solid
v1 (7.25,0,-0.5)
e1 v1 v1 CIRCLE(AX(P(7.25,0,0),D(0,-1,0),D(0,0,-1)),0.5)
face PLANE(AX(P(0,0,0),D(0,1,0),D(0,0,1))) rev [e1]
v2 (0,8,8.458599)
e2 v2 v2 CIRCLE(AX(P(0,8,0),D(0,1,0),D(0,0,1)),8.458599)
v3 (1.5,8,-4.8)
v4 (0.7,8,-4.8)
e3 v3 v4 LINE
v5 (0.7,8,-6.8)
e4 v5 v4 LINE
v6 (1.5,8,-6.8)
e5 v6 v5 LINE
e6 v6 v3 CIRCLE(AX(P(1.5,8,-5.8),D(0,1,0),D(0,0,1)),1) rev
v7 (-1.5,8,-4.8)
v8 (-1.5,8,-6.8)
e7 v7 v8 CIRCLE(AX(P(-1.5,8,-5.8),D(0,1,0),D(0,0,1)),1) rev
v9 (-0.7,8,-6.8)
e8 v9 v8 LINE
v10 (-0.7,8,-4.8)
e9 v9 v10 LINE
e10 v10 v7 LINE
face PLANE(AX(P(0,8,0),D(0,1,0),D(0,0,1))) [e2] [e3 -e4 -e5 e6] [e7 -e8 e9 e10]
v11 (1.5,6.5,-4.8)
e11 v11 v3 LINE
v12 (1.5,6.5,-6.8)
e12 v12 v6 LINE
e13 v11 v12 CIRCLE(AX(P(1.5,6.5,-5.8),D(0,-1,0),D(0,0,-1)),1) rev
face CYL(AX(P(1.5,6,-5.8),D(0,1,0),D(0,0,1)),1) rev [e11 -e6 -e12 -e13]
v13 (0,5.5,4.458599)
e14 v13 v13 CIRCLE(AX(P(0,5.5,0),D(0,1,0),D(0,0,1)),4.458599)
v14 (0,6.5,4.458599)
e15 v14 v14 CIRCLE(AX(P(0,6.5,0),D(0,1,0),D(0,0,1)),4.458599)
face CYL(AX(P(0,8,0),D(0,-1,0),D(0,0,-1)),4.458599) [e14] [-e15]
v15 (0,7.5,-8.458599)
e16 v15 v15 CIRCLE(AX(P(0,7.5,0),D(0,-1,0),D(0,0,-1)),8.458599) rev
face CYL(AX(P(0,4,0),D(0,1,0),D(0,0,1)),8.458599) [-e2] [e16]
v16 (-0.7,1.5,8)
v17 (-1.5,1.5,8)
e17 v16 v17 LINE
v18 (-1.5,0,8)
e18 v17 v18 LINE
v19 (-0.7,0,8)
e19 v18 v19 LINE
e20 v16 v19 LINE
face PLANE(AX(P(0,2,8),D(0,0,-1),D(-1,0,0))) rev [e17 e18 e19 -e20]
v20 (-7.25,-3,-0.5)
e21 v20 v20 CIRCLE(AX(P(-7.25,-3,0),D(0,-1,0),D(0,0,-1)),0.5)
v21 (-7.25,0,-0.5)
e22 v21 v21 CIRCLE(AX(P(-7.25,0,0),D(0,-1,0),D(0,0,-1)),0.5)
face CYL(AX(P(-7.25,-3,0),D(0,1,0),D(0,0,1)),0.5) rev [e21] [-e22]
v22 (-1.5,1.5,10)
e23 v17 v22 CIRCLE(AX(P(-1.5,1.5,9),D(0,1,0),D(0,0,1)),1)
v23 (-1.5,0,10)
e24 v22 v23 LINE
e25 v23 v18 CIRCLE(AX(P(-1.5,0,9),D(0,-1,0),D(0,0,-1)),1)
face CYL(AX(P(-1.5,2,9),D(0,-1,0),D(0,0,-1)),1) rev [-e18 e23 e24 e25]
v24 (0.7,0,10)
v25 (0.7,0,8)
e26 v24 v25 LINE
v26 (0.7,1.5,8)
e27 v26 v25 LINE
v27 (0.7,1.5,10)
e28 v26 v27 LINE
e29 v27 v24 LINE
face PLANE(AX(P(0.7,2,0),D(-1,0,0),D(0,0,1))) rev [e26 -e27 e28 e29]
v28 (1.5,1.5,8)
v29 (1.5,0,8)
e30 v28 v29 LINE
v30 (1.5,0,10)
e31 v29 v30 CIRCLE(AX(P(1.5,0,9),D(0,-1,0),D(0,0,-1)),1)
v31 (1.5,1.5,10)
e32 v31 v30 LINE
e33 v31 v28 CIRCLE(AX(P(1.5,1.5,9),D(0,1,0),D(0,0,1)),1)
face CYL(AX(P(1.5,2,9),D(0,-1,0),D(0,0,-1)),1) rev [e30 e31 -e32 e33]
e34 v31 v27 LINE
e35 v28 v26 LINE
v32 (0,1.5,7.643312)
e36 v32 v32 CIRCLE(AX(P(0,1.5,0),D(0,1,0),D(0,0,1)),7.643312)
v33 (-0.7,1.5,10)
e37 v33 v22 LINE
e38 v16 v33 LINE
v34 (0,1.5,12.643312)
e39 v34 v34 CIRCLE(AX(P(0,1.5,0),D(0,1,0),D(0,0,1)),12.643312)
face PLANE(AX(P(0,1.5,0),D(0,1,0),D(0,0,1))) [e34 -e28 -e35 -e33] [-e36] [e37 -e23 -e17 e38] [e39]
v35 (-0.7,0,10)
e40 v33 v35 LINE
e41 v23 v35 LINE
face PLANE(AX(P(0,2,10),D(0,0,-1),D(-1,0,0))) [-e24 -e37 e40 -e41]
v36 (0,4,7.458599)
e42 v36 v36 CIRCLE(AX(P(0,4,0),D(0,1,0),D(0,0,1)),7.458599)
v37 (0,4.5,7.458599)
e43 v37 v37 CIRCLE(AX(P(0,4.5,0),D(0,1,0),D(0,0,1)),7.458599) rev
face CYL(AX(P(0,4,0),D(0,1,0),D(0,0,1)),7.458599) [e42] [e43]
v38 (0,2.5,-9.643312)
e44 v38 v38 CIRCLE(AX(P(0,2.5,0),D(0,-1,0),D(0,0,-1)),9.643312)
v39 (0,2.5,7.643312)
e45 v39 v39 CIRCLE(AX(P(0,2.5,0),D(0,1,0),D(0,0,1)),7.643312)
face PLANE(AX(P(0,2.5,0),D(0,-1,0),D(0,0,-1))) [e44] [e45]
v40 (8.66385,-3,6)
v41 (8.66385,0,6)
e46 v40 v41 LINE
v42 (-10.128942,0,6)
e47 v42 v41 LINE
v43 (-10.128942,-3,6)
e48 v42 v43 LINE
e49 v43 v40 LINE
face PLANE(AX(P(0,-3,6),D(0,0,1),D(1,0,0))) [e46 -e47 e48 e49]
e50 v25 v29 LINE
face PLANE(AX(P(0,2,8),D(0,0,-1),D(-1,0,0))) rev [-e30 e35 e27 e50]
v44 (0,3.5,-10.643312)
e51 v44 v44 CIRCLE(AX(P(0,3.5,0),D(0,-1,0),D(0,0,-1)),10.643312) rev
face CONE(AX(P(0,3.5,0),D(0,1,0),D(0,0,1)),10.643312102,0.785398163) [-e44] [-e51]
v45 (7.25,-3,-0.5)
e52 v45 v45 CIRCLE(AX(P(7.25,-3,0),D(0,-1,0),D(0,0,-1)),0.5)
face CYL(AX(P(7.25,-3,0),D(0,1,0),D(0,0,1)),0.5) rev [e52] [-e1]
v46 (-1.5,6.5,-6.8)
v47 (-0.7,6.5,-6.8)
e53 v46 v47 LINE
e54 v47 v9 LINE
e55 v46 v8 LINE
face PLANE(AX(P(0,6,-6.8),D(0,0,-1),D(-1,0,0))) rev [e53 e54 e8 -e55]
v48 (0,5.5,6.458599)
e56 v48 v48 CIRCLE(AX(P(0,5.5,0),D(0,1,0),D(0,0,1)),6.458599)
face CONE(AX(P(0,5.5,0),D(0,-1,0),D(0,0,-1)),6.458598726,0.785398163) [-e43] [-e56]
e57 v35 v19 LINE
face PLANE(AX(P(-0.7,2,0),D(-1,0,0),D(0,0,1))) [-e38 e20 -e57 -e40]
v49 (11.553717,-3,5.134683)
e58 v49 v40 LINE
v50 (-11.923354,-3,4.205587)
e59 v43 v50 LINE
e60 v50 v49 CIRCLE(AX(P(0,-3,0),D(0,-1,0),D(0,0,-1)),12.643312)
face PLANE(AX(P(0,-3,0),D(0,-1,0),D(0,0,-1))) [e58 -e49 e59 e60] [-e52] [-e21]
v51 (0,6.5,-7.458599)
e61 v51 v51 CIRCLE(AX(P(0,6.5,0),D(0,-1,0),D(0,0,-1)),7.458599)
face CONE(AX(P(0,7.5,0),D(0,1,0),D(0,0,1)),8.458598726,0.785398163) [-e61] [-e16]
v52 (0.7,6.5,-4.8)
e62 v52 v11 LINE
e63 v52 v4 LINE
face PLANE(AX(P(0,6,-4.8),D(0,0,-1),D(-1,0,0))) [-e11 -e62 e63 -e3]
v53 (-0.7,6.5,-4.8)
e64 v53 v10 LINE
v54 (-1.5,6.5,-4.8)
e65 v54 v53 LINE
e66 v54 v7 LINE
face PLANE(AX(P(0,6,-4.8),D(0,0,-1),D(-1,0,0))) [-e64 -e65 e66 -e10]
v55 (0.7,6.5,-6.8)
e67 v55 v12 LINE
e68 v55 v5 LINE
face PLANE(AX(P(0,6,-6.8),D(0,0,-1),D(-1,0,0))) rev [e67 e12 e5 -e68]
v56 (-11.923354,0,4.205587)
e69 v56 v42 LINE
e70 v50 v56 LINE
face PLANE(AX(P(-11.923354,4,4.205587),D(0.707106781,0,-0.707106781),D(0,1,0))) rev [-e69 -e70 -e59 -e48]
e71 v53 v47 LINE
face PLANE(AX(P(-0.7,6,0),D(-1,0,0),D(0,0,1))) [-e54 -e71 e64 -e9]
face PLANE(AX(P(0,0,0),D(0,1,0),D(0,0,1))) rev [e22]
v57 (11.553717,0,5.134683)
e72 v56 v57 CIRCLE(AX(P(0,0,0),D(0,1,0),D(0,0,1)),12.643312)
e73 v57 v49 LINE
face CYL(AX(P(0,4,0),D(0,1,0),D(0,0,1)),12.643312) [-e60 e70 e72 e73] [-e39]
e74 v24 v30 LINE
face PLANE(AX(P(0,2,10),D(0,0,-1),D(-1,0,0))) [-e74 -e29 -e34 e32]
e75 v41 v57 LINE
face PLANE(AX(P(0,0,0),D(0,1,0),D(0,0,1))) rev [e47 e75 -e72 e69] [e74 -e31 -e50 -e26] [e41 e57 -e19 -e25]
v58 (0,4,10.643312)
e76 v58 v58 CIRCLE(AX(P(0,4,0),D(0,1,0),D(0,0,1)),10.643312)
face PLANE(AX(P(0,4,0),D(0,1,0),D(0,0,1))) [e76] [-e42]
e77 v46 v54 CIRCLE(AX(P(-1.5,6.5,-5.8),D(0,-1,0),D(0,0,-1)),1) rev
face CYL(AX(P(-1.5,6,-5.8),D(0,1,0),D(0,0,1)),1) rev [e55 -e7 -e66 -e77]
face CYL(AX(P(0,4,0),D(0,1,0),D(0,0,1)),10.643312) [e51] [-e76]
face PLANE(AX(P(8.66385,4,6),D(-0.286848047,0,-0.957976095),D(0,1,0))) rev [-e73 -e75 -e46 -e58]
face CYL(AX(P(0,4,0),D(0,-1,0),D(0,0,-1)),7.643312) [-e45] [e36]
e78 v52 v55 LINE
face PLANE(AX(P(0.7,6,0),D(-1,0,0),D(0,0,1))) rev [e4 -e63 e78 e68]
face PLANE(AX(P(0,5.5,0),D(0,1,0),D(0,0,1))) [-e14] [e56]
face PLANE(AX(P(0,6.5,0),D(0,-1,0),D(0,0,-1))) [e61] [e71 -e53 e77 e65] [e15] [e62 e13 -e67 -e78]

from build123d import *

# Parameters (mm, degrees)
SKETCH_24_R         = 7.643312102
BOSS_EXTRUDE1_DEPTH = 4
SKETCH3_W           = 5
SKETCH3_H           = 1.5
SKETCH3_W_2         = 3
SKETCH5_R           = 4.458598726
BOSS_EXTRUDE2_DEPTH = 4
SKETCH6_W           = 4
SKETCH6_H           = 1.5
SKETCH6_W_2         = 3
CUT_EXTRUDE2_DEPTH  = 2
CUT_EXTRUDE3_DEPTH  = 2
BOSS_EXTRUDE4_START = 3
SKETCH10_R          = 0.5
BOSS_EXTRUDE4_DEPTH = 3
CHAMFER1_START      = -4
CHAMFER1_2_DEPTH    = 4


with BuildPart() as part:
    # Sketch 24 → Boss-Extrude1 (new body)
    with BuildSketch(Plane(origin=(0, 0, 0), x_dir=(1, 0, 0), z_dir=(0, 1, 0))):
        with Locations(Location((0, 0, 0), (0, 0, 270))):
            Circle(SKETCH_24_R)
    extrude(amount=BOSS_EXTRUDE1_DEPTH)

    # Sketch3 → Revolve1 (revolve)
    with BuildSketch(Plane.XY, mode=Mode.PRIVATE) as revolve1_sk:
        with Locations((-10.143312102, 0.75)):
            Rectangle(SKETCH3_W, SKETCH3_H)
        with Locations((-9.143312102, 3.25)):
            Rectangle(SKETCH3_W_2, SKETCH3_H)
    revolve(revolve1_sk.sketch.rotate(Axis((0, 4, 0), (0, -1, 0)), 270), axis=Axis((0, 4, 0), (0, -1, 0)))

    # Sketch5 → Boss-Extrude2 (add)
    with BuildSketch(Plane(origin=(0, 4, 0), x_dir=(1, 0, 0), z_dir=(0, 1, 0))):
        with Locations(Location((0, 0, 0), (0, 0, 270))):
            Circle(SKETCH5_R)
    extrude(amount=BOSS_EXTRUDE2_DEPTH)

    # Sketch6 → Revolve2 (revolve)
    with BuildSketch(Plane.XY, mode=Mode.PRIVATE) as revolve2_sk:
        with Locations((-6.458598726, 7.25)):
            Rectangle(SKETCH6_W, SKETCH6_H)
        with Locations((-5.958598726, 4.75)):
            Rectangle(SKETCH6_W_2, SKETCH6_H)
    revolve(revolve2_sk.sketch.rotate(Axis((0, 4, 0), (0, -1, 0)), 270), axis=Axis((0, 4, 0), (0, -1, 0)))

    # Sketch8 → Cut-Extrude2 (cut)
    with BuildSketch(Plane.XZ):
        with BuildLine():
            Line((-0.7, 10), (-1.5, 10))
            ThreePointArc((-1.5, 10), (-2.5, 9), (-1.5, 8))
            Line((-1.5, 8), (-0.7, 8))
            Line((-0.7, 8), (-0.7, 10))
        make_face()
        with BuildLine():
            Line((1.5, 10), (0.7, 10))
            Line((0.7, 10), (0.7, 8))
            Line((0.7, 8), (1.5, 8))
            ThreePointArc((1.5, 8), (2.5, 9), (1.5, 10))
        make_face()
    extrude(amount=-CUT_EXTRUDE2_DEPTH, mode=Mode.SUBTRACT)

    # Sketch9 → Cut-Extrude3 (cut)
    with BuildSketch(Plane(origin=(0, 8, -8), x_dir=(-1, 0, 0), z_dir=(0, -1, 0))):
        with BuildLine():
            Line((-0.7, -1.2), (-1.5, -1.2))
            ThreePointArc((-1.5, -1.2), (-2.5, -2.2), (-1.5, -3.2))
            Line((-1.5, -3.2), (-0.7, -3.2))
            Line((-0.7, -3.2), (-0.7, -1.2))
        make_face()
        with BuildLine():
            Line((1.5, -1.2), (0.7, -1.2))
            Line((0.7, -1.2), (0.7, -3.2))
            Line((0.7, -3.2), (1.5, -3.2))
            ThreePointArc((1.5, -3.2), (2.5, -2.2), (1.5, -1.2))
        make_face()
    extrude(amount=CUT_EXTRUDE3_DEPTH, mode=Mode.SUBTRACT)

    # Sketch10 → Boss-Extrude4 (add)
    with BuildSketch(Plane.XZ.offset(BOSS_EXTRUDE4_START)):
        with BuildLine():
            Line((11.12894159, 6), (-11.12894159, 6))
            ThreePointArc((-11.12894159, 6), (-6.572693348, -10.800603829), (10.442822057, -7.127468582))
            ThreePointArc((10.442822057, -7.127468582), (12.080670499, -3.729710606), (12.643312102, 0))
            ThreePointArc((12.643312102, 0), (12.258874801, 3.094079752), (11.12894159, 6))
        make_face()
        with Locations(Location((-7.25, 0, 0), (0, 0, 270))):
            Circle(SKETCH10_R, mode=Mode.SUBTRACT)
        with Locations(Location((7.25, 0, 0), (0, 0, 270))):
            Circle(SKETCH10_R, mode=Mode.SUBTRACT)
    extrude(amount=-BOSS_EXTRUDE4_DEPTH)

    # Chamfer1: read off the stored shape, not the designer's step
    # Chamfer1 outline → Chamfer1 (revolve, cut)
    with BuildSketch(Plane.XY):
        Polygon((10.643312102, 3.5), (9.643312102, 2.5), (10.643312102, 2.5), align=None)
        Polygon((6.458598726, 5.5), (7.458598726, 4.5), (7.458598726, 5.5), align=None)
        Polygon((7.458598726, 6.5), (8.458598726, 6.5), (8.458598726, 7.5), align=None)
    revolve(axis=Axis((0, 0, 0), (0, 1, 0)), mode=Mode.SUBTRACT)

    # Chamfer1 2 outline → Chamfer1 2 (cut)
    with BuildSketch(Plane(origin=(0, 0, 0), x_dir=(1, 0, 0), z_dir=(0, 1, 0)).offset(CHAMFER1_START)):
        with BuildLine():
            ThreePointArc((11.12894159, -6), (11.349578809, -5.571391366), (11.553716625, -5.134683345))
            Line((11.553716625, -5.134683345), (8.663849742, -6))
            Line((8.663849742, -6), (11.12894159, -6))
        make_face()
        with BuildLine():
            Line((-11.12894159, -6), (-10.12894159, -6))
            Line((-10.12894159, -6), (-11.923354215, -4.205587374))
            ThreePointArc((-11.923354215, -4.205587374), (-11.561014862, -5.118229798), (-11.12894159, -6))
        make_face()
    extrude(amount=CHAMFER1_2_DEPTH, mode=Mode.SUBTRACT)


solid = part.part
